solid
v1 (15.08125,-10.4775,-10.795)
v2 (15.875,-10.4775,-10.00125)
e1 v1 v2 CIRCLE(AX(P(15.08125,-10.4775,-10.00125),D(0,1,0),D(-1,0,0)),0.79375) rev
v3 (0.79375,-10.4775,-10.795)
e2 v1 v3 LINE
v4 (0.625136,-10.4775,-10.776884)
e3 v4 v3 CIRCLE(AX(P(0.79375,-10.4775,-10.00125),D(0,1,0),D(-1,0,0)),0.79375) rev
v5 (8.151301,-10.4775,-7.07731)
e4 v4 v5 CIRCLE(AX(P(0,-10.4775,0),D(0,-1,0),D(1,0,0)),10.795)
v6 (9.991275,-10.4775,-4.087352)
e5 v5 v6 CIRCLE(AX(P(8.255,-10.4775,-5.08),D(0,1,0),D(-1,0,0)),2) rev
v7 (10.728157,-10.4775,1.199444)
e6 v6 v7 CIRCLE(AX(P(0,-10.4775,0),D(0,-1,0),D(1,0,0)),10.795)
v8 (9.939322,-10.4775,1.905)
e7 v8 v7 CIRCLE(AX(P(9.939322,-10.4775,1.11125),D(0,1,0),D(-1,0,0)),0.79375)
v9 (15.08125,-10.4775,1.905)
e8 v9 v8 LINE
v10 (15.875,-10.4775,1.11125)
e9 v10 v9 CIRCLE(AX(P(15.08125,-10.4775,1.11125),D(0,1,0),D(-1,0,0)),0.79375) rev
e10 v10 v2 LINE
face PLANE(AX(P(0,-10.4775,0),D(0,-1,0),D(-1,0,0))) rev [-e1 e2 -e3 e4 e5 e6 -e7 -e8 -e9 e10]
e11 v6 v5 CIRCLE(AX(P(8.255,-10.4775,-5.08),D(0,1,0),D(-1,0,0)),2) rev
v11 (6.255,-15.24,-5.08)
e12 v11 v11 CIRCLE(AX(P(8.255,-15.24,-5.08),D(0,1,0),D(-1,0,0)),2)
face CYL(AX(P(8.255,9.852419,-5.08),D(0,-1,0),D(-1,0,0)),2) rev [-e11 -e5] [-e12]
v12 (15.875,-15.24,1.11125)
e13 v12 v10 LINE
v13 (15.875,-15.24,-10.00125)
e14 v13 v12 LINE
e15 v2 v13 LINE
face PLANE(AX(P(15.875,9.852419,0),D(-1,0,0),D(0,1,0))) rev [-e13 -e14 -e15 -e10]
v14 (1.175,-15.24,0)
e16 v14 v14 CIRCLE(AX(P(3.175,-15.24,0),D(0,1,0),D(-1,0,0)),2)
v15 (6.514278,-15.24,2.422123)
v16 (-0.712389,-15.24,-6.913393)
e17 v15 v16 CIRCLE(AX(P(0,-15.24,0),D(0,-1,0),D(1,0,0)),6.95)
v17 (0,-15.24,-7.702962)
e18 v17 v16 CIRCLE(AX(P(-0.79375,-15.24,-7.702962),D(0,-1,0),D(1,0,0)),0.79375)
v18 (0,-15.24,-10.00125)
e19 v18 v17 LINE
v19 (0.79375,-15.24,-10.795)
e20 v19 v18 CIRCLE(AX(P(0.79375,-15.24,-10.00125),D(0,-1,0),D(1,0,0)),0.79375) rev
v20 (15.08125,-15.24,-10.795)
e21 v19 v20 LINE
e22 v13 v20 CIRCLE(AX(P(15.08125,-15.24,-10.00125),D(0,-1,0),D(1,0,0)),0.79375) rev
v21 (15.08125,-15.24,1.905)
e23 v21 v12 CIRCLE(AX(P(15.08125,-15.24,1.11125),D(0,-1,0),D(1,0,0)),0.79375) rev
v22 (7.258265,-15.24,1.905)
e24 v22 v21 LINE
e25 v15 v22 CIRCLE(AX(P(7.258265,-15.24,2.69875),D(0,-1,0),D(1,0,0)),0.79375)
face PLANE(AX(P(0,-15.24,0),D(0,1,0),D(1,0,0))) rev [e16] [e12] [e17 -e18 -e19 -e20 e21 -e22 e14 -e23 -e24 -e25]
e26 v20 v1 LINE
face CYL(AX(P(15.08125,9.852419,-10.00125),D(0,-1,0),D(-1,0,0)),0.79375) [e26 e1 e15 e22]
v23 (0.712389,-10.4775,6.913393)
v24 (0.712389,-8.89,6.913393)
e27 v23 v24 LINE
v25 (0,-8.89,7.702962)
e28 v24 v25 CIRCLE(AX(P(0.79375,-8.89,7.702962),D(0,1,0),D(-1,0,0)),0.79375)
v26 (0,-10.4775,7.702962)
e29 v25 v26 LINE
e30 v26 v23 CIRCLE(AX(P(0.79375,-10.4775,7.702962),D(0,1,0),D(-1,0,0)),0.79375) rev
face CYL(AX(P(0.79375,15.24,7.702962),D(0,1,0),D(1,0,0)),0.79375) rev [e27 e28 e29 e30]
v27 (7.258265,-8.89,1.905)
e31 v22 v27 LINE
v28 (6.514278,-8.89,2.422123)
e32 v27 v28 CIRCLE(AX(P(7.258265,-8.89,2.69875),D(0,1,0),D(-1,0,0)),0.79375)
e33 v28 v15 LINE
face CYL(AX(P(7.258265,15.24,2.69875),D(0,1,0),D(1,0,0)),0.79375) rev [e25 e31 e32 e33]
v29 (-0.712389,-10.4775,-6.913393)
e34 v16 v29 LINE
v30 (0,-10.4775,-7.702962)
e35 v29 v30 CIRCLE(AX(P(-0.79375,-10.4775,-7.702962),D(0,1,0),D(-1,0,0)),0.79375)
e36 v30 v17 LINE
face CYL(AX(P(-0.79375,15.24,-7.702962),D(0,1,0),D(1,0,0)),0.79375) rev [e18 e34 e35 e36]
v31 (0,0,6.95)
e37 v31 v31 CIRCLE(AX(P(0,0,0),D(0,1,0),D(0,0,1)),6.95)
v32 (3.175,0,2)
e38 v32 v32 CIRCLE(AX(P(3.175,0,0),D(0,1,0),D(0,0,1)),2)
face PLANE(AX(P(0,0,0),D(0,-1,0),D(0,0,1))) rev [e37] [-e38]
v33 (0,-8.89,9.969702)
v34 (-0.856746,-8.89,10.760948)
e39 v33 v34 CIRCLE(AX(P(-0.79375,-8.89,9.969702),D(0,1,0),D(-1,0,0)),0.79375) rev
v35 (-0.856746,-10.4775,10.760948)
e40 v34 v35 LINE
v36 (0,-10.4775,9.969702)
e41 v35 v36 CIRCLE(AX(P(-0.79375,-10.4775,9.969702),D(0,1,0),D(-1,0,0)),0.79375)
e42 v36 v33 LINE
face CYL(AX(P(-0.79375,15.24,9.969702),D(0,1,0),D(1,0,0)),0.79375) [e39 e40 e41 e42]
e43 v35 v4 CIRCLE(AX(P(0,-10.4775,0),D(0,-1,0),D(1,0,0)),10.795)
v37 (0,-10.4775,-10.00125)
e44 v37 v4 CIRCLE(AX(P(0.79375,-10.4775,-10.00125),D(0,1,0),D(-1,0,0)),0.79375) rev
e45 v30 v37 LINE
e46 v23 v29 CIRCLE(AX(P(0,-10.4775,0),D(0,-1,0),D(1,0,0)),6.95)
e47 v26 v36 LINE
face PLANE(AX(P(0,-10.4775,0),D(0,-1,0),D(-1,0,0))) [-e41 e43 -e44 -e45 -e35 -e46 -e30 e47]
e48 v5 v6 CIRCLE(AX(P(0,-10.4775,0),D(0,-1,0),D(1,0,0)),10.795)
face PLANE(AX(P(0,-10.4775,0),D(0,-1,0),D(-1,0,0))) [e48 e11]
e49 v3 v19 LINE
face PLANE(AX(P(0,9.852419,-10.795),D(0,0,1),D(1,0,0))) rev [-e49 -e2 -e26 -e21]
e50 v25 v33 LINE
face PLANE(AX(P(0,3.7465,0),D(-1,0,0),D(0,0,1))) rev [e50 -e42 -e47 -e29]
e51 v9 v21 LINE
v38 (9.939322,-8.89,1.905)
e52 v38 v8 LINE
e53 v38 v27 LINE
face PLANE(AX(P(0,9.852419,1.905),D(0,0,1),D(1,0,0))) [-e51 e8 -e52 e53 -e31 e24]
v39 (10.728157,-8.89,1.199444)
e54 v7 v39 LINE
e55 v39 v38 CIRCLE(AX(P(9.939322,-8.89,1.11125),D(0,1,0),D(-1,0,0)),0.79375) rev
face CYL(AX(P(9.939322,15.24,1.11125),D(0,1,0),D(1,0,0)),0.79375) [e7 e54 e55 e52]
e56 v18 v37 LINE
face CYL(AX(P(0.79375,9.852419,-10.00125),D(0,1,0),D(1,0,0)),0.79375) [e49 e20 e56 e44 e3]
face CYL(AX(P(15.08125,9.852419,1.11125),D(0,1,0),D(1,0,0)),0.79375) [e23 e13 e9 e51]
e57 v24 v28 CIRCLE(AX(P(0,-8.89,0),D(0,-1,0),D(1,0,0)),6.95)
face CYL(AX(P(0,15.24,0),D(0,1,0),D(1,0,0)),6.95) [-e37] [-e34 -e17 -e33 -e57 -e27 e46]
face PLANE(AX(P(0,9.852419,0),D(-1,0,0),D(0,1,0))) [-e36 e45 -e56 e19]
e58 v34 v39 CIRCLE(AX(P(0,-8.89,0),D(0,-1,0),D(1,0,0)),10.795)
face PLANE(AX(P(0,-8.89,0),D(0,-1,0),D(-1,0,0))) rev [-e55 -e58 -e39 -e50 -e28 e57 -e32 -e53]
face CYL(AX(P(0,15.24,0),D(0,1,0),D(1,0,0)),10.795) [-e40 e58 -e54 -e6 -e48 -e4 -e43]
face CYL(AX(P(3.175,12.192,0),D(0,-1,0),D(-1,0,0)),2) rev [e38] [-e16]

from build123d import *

# Parameters (mm, degrees)
SKETCH2_W           = 4.7625
SKETCH2_H           = 6.95
SKETCH2_W_2         = 1.5875
SKETCH2_H_2         = 3.845
SKETCH2_W_3         = 17.78
SKETCH3_R           = 11.338051479
CUT_EXTRUDE1_DEPTH  = 21.336
SKETCH5_R           = 2
CUT_EXTRUDE3_DEPTH  = 27.432
BOSS_EXTRUDE2_START = -4.7625
SKETCH5_3_R         = 2
BOSS_EXTRUDE2_DEPTH = 4.7625
FILLET1_R           = 0.79375
CUT_EXTRUDE4_START  = -14.224
CUT_EXTRUDE4_DEPTH  = 14.224
FILLET2_R           = 0.79375


with BuildPart() as part:
    # Sketch2 → Revolve2 (revolve)
    with BuildSketch(Plane(origin=(0, 0, 0), x_dir=(0, 1, 0), z_dir=(0, 0, 1)), mode=Mode.PRIVATE) as revolve2_sk:
        with Locations((-12.85875, 3.475)):
            Rectangle(SKETCH2_W, SKETCH2_H)
        with Locations((-9.68375, 3.475)):
            Rectangle(SKETCH2_W_2, SKETCH2_H)
        with Locations((-9.68375, 8.8725)):
            Rectangle(SKETCH2_W_2, SKETCH2_H_2)
        with Locations((0, 3.475)):
            Rectangle(SKETCH2_W_3, SKETCH2_H)
        with Locations((9.68375, 3.475)):
            Rectangle(SKETCH2_W_2, SKETCH2_H)
        with Locations((9.68375, 8.8725)):
            Rectangle(SKETCH2_W_2, SKETCH2_H_2)
        with Locations((12.85875, 3.475)):
            Rectangle(SKETCH2_W, SKETCH2_H)
    revolve(revolve2_sk.sketch.rotate(Axis((0, -15.24, 0), (0, 1, 0)), 180), axis=Axis((0, -15.24, 0), (0, 1, 0)))

    # Sketch3 → Cut-Extrude1 (cut)
    with BuildSketch(Plane(origin=(0, 0, 0), x_dir=(-1, 0, 0), z_dir=(0, 1, 0))):
        Circle(SKETCH3_R)
    extrude(amount=-CUT_EXTRUDE1_DEPTH, mode=Mode.SUBTRACT)

    # Sketch5 → Cut-Extrude3 (cut)
    with BuildSketch(Plane(origin=(0, 15.24, 0), x_dir=(-1, 0, 0), z_dir=(0, 1, 0))):
        with Locations((-3.175, 0)):
            Circle(SKETCH5_R)
        with BuildLine():
            ThreePointArc((-1.175, 0), (-1.559736192, 1.179373914), (-2.565922829, 1.905))
            Line((-2.565922829, 1.905), (-3.784077171, 1.905))
            ThreePointArc((-3.784077171, 1.905), (-4.354373914, -1.615263808), (-1.175, 0))
        make_face()
        with BuildLine():
            Line((-3.784077171, 1.905), (-2.565922829, 1.905))
            ThreePointArc((-2.565922829, 1.905), (-3.175, 2), (-3.784077171, 1.905))
        make_face()
    extrude(amount=-CUT_EXTRUDE3_DEPTH, mode=Mode.SUBTRACT)

    # Sketch5<3> → Boss-Extrude2 (add)
    with BuildSketch(Plane(origin=(0, 15.24, 0), x_dir=(-1, 0, 0), z_dir=(0, 1, 0)).offset(BOSS_EXTRUDE2_START)):
        with BuildLine():
            Line((-15.875, -10.795), (0, -10.795))
            Line((0, -10.795), (0, -6.95))
            ThreePointArc((0, -6.95), (-5.547172703, -4.187048483), (-6.683821886, 1.905))
            Line((-6.683821886, 1.905), (-15.875, 1.905))
            Line((-15.875, 1.905), (-15.875, -10.795))
        make_face()
        with Locations((-8.255, -5.08)):
            Circle(SKETCH5_3_R, mode=Mode.SUBTRACT)
    extrude(amount=BOSS_EXTRUDE2_DEPTH)

    # Fillet1
    # the kernel refuses this fillet: 0.79375 mm, written as the material it adds along each edge
    with BuildSketch(Plane(origin=(0, 10.4775, -6.95), x_dir=(-0.9986823309895368, 0, 0.051318629846335534), z_dir=(0, 1, 0))) as fillet1_piece_1:
        with BuildLine():
            CenterArc((0.754063117, -0.7927041), FILLET1_R, 92.941633047, 84.116733906)
            Line((-0.038640983, -0.751969938), (0, 0))
            ThreePointArc((0, 0), (0.356664477, -0.0091578), (0.713328955, 0))
        make_face()
    extrude(amount=4.7625)
    with BuildSketch(Plane(origin=(6.683821886, 9.041391923, 1.905), x_dir=(1, 0, 0), z_dir=(0, 1, 0))) as fillet1_piece_2:
        with BuildLine():
            CenterArc((0.574443231, -0.79375), FILLET1_R, 90, 69.603984808)
            ThreePointArc((-0.169543589, -0.51712268), (-0.079708314, -0.26022145), (0, 0))
            Line((0, 0), (0.574443231, 0))
        make_face()
    extrude(amount=6.198608077)
    # the kernel refuses this fillet: 0.79375 mm, written as the material it takes off along each edge
    with BuildSketch(Plane(origin=(0, 10.4775, -10.795), x_dir=(1, 0, 0), z_dir=(0, 1, 0))) as fillet1_2_piece_1:
        with BuildLine():
            CenterArc((FILLET1_R, -FILLET1_R), FILLET1_R, 90, 90)
            Line((0, -FILLET1_R), (0, 0))
            Line((0, 0), (FILLET1_R, 0))
        make_face()
    extrude(amount=6.746875, mode=Mode.SUBTRACT)
    with BuildSketch(Plane(origin=(15.875, 8.493125, 1.905), x_dir=(0, 0, -1), z_dir=(0, 1, 0)), Plane(origin=(15.875, 8.493125, -10.795), x_dir=(-1, 0, 0), z_dir=(0, 1, 0))) as fillet1_2_piece_2:
        with BuildLine():
            CenterArc((FILLET1_R, FILLET1_R), FILLET1_R, 180, 90)
            Line((0, FILLET1_R), (0, 0))
            Line((0, 0), (FILLET1_R, 0))
        make_face()
    extrude(amount=8.73125, mode=Mode.SUBTRACT)

    # Sketch6 → Cut-Extrude4 (cut)
    with BuildSketch(Plane(origin=(0, 10.4775, 0), x_dir=(-1, 0, 0), z_dir=(0, 1, 0)).offset(CUT_EXTRUDE4_START)):
        with BuildLine():
            ThreePointArc((-6.514278297, 2.42212268), (-3.966657748, 5.70684907), (0, 6.95))
            Line((0, 6.95), (0, 10.795))
            ThreePointArc((0, 10.795), (-6.927032193, 8.279387055), (-10.625582337, 1.905))
            Line((-10.625582337, 1.905), (-7.258265116, 1.905))
            ThreePointArc((-7.258265116, 1.905), (-6.805238557, 2.046978568), (-6.514278297, 2.42212268))
        make_face()
    extrude(amount=CUT_EXTRUDE4_DEPTH, mode=Mode.SUBTRACT)

    # Fillet2
    # the kernel refuses this fillet: 0.79375 mm, written as the material it adds along each edge
    with BuildSketch(Plane(origin=(0, 8.89, 6.95), x_dir=(0.9986823309895368, 0, -0.051318629846333855), z_dir=(0, 1, 0))) as fillet2_piece_1:
        with BuildLine():
            CenterArc((0.754063117, -0.7927041), FILLET2_R, 92.941633047, 84.116733906)
            Line((-0.038640983, -0.751969938), (0, 0))
            ThreePointArc((0, 0), (0.356664477, -0.0091578), (0.713328955, 0))
        make_face()
    extrude(amount=1.5875)
    # the kernel refuses this fillet: 0.79375 mm, written as the material it takes off along each edge
    with BuildSketch(Plane(origin=(0, 6.746443854, 10.795), x_dir=(0, 0, -1), z_dir=(0, 1, 0))) as fillet2_2_piece_1:
        with BuildLine():
            CenterArc((0.825297773, 0.79375), FILLET2_R, 175.447928579, 94.552071421)
            ThreePointArc((0.034051564, 0.856746032), (0.00851625, 0.428711229), (0, 0))
            Line((0, 0), (0.825297773, 0))
        make_face()
    extrude(amount=5.874612291, mode=Mode.SUBTRACT)
    with BuildSketch(Plane(origin=(10.625582337, 7.107567927, 1.905), x_dir=(-1, 0, 0), z_dir=(0, 1, 0))) as fillet2_2_piece_2:
        with BuildLine():
            CenterArc((0.686260177, -0.79375), FILLET2_R, 90, 83.620629792)
            ThreePointArc((-0.102574915, -0.705555556), (-0.057113988, -0.351930706), (0, 0))
            Line((0, 0), (0.686260177, 0))
        make_face()
    extrude(amount=3.369932073, mode=Mode.SUBTRACT)


with BuildPart() as body_2:
    # Mirror1: mirrored copy
    add(part.part.mirror(Plane.ZX))


solid = body_2.part
